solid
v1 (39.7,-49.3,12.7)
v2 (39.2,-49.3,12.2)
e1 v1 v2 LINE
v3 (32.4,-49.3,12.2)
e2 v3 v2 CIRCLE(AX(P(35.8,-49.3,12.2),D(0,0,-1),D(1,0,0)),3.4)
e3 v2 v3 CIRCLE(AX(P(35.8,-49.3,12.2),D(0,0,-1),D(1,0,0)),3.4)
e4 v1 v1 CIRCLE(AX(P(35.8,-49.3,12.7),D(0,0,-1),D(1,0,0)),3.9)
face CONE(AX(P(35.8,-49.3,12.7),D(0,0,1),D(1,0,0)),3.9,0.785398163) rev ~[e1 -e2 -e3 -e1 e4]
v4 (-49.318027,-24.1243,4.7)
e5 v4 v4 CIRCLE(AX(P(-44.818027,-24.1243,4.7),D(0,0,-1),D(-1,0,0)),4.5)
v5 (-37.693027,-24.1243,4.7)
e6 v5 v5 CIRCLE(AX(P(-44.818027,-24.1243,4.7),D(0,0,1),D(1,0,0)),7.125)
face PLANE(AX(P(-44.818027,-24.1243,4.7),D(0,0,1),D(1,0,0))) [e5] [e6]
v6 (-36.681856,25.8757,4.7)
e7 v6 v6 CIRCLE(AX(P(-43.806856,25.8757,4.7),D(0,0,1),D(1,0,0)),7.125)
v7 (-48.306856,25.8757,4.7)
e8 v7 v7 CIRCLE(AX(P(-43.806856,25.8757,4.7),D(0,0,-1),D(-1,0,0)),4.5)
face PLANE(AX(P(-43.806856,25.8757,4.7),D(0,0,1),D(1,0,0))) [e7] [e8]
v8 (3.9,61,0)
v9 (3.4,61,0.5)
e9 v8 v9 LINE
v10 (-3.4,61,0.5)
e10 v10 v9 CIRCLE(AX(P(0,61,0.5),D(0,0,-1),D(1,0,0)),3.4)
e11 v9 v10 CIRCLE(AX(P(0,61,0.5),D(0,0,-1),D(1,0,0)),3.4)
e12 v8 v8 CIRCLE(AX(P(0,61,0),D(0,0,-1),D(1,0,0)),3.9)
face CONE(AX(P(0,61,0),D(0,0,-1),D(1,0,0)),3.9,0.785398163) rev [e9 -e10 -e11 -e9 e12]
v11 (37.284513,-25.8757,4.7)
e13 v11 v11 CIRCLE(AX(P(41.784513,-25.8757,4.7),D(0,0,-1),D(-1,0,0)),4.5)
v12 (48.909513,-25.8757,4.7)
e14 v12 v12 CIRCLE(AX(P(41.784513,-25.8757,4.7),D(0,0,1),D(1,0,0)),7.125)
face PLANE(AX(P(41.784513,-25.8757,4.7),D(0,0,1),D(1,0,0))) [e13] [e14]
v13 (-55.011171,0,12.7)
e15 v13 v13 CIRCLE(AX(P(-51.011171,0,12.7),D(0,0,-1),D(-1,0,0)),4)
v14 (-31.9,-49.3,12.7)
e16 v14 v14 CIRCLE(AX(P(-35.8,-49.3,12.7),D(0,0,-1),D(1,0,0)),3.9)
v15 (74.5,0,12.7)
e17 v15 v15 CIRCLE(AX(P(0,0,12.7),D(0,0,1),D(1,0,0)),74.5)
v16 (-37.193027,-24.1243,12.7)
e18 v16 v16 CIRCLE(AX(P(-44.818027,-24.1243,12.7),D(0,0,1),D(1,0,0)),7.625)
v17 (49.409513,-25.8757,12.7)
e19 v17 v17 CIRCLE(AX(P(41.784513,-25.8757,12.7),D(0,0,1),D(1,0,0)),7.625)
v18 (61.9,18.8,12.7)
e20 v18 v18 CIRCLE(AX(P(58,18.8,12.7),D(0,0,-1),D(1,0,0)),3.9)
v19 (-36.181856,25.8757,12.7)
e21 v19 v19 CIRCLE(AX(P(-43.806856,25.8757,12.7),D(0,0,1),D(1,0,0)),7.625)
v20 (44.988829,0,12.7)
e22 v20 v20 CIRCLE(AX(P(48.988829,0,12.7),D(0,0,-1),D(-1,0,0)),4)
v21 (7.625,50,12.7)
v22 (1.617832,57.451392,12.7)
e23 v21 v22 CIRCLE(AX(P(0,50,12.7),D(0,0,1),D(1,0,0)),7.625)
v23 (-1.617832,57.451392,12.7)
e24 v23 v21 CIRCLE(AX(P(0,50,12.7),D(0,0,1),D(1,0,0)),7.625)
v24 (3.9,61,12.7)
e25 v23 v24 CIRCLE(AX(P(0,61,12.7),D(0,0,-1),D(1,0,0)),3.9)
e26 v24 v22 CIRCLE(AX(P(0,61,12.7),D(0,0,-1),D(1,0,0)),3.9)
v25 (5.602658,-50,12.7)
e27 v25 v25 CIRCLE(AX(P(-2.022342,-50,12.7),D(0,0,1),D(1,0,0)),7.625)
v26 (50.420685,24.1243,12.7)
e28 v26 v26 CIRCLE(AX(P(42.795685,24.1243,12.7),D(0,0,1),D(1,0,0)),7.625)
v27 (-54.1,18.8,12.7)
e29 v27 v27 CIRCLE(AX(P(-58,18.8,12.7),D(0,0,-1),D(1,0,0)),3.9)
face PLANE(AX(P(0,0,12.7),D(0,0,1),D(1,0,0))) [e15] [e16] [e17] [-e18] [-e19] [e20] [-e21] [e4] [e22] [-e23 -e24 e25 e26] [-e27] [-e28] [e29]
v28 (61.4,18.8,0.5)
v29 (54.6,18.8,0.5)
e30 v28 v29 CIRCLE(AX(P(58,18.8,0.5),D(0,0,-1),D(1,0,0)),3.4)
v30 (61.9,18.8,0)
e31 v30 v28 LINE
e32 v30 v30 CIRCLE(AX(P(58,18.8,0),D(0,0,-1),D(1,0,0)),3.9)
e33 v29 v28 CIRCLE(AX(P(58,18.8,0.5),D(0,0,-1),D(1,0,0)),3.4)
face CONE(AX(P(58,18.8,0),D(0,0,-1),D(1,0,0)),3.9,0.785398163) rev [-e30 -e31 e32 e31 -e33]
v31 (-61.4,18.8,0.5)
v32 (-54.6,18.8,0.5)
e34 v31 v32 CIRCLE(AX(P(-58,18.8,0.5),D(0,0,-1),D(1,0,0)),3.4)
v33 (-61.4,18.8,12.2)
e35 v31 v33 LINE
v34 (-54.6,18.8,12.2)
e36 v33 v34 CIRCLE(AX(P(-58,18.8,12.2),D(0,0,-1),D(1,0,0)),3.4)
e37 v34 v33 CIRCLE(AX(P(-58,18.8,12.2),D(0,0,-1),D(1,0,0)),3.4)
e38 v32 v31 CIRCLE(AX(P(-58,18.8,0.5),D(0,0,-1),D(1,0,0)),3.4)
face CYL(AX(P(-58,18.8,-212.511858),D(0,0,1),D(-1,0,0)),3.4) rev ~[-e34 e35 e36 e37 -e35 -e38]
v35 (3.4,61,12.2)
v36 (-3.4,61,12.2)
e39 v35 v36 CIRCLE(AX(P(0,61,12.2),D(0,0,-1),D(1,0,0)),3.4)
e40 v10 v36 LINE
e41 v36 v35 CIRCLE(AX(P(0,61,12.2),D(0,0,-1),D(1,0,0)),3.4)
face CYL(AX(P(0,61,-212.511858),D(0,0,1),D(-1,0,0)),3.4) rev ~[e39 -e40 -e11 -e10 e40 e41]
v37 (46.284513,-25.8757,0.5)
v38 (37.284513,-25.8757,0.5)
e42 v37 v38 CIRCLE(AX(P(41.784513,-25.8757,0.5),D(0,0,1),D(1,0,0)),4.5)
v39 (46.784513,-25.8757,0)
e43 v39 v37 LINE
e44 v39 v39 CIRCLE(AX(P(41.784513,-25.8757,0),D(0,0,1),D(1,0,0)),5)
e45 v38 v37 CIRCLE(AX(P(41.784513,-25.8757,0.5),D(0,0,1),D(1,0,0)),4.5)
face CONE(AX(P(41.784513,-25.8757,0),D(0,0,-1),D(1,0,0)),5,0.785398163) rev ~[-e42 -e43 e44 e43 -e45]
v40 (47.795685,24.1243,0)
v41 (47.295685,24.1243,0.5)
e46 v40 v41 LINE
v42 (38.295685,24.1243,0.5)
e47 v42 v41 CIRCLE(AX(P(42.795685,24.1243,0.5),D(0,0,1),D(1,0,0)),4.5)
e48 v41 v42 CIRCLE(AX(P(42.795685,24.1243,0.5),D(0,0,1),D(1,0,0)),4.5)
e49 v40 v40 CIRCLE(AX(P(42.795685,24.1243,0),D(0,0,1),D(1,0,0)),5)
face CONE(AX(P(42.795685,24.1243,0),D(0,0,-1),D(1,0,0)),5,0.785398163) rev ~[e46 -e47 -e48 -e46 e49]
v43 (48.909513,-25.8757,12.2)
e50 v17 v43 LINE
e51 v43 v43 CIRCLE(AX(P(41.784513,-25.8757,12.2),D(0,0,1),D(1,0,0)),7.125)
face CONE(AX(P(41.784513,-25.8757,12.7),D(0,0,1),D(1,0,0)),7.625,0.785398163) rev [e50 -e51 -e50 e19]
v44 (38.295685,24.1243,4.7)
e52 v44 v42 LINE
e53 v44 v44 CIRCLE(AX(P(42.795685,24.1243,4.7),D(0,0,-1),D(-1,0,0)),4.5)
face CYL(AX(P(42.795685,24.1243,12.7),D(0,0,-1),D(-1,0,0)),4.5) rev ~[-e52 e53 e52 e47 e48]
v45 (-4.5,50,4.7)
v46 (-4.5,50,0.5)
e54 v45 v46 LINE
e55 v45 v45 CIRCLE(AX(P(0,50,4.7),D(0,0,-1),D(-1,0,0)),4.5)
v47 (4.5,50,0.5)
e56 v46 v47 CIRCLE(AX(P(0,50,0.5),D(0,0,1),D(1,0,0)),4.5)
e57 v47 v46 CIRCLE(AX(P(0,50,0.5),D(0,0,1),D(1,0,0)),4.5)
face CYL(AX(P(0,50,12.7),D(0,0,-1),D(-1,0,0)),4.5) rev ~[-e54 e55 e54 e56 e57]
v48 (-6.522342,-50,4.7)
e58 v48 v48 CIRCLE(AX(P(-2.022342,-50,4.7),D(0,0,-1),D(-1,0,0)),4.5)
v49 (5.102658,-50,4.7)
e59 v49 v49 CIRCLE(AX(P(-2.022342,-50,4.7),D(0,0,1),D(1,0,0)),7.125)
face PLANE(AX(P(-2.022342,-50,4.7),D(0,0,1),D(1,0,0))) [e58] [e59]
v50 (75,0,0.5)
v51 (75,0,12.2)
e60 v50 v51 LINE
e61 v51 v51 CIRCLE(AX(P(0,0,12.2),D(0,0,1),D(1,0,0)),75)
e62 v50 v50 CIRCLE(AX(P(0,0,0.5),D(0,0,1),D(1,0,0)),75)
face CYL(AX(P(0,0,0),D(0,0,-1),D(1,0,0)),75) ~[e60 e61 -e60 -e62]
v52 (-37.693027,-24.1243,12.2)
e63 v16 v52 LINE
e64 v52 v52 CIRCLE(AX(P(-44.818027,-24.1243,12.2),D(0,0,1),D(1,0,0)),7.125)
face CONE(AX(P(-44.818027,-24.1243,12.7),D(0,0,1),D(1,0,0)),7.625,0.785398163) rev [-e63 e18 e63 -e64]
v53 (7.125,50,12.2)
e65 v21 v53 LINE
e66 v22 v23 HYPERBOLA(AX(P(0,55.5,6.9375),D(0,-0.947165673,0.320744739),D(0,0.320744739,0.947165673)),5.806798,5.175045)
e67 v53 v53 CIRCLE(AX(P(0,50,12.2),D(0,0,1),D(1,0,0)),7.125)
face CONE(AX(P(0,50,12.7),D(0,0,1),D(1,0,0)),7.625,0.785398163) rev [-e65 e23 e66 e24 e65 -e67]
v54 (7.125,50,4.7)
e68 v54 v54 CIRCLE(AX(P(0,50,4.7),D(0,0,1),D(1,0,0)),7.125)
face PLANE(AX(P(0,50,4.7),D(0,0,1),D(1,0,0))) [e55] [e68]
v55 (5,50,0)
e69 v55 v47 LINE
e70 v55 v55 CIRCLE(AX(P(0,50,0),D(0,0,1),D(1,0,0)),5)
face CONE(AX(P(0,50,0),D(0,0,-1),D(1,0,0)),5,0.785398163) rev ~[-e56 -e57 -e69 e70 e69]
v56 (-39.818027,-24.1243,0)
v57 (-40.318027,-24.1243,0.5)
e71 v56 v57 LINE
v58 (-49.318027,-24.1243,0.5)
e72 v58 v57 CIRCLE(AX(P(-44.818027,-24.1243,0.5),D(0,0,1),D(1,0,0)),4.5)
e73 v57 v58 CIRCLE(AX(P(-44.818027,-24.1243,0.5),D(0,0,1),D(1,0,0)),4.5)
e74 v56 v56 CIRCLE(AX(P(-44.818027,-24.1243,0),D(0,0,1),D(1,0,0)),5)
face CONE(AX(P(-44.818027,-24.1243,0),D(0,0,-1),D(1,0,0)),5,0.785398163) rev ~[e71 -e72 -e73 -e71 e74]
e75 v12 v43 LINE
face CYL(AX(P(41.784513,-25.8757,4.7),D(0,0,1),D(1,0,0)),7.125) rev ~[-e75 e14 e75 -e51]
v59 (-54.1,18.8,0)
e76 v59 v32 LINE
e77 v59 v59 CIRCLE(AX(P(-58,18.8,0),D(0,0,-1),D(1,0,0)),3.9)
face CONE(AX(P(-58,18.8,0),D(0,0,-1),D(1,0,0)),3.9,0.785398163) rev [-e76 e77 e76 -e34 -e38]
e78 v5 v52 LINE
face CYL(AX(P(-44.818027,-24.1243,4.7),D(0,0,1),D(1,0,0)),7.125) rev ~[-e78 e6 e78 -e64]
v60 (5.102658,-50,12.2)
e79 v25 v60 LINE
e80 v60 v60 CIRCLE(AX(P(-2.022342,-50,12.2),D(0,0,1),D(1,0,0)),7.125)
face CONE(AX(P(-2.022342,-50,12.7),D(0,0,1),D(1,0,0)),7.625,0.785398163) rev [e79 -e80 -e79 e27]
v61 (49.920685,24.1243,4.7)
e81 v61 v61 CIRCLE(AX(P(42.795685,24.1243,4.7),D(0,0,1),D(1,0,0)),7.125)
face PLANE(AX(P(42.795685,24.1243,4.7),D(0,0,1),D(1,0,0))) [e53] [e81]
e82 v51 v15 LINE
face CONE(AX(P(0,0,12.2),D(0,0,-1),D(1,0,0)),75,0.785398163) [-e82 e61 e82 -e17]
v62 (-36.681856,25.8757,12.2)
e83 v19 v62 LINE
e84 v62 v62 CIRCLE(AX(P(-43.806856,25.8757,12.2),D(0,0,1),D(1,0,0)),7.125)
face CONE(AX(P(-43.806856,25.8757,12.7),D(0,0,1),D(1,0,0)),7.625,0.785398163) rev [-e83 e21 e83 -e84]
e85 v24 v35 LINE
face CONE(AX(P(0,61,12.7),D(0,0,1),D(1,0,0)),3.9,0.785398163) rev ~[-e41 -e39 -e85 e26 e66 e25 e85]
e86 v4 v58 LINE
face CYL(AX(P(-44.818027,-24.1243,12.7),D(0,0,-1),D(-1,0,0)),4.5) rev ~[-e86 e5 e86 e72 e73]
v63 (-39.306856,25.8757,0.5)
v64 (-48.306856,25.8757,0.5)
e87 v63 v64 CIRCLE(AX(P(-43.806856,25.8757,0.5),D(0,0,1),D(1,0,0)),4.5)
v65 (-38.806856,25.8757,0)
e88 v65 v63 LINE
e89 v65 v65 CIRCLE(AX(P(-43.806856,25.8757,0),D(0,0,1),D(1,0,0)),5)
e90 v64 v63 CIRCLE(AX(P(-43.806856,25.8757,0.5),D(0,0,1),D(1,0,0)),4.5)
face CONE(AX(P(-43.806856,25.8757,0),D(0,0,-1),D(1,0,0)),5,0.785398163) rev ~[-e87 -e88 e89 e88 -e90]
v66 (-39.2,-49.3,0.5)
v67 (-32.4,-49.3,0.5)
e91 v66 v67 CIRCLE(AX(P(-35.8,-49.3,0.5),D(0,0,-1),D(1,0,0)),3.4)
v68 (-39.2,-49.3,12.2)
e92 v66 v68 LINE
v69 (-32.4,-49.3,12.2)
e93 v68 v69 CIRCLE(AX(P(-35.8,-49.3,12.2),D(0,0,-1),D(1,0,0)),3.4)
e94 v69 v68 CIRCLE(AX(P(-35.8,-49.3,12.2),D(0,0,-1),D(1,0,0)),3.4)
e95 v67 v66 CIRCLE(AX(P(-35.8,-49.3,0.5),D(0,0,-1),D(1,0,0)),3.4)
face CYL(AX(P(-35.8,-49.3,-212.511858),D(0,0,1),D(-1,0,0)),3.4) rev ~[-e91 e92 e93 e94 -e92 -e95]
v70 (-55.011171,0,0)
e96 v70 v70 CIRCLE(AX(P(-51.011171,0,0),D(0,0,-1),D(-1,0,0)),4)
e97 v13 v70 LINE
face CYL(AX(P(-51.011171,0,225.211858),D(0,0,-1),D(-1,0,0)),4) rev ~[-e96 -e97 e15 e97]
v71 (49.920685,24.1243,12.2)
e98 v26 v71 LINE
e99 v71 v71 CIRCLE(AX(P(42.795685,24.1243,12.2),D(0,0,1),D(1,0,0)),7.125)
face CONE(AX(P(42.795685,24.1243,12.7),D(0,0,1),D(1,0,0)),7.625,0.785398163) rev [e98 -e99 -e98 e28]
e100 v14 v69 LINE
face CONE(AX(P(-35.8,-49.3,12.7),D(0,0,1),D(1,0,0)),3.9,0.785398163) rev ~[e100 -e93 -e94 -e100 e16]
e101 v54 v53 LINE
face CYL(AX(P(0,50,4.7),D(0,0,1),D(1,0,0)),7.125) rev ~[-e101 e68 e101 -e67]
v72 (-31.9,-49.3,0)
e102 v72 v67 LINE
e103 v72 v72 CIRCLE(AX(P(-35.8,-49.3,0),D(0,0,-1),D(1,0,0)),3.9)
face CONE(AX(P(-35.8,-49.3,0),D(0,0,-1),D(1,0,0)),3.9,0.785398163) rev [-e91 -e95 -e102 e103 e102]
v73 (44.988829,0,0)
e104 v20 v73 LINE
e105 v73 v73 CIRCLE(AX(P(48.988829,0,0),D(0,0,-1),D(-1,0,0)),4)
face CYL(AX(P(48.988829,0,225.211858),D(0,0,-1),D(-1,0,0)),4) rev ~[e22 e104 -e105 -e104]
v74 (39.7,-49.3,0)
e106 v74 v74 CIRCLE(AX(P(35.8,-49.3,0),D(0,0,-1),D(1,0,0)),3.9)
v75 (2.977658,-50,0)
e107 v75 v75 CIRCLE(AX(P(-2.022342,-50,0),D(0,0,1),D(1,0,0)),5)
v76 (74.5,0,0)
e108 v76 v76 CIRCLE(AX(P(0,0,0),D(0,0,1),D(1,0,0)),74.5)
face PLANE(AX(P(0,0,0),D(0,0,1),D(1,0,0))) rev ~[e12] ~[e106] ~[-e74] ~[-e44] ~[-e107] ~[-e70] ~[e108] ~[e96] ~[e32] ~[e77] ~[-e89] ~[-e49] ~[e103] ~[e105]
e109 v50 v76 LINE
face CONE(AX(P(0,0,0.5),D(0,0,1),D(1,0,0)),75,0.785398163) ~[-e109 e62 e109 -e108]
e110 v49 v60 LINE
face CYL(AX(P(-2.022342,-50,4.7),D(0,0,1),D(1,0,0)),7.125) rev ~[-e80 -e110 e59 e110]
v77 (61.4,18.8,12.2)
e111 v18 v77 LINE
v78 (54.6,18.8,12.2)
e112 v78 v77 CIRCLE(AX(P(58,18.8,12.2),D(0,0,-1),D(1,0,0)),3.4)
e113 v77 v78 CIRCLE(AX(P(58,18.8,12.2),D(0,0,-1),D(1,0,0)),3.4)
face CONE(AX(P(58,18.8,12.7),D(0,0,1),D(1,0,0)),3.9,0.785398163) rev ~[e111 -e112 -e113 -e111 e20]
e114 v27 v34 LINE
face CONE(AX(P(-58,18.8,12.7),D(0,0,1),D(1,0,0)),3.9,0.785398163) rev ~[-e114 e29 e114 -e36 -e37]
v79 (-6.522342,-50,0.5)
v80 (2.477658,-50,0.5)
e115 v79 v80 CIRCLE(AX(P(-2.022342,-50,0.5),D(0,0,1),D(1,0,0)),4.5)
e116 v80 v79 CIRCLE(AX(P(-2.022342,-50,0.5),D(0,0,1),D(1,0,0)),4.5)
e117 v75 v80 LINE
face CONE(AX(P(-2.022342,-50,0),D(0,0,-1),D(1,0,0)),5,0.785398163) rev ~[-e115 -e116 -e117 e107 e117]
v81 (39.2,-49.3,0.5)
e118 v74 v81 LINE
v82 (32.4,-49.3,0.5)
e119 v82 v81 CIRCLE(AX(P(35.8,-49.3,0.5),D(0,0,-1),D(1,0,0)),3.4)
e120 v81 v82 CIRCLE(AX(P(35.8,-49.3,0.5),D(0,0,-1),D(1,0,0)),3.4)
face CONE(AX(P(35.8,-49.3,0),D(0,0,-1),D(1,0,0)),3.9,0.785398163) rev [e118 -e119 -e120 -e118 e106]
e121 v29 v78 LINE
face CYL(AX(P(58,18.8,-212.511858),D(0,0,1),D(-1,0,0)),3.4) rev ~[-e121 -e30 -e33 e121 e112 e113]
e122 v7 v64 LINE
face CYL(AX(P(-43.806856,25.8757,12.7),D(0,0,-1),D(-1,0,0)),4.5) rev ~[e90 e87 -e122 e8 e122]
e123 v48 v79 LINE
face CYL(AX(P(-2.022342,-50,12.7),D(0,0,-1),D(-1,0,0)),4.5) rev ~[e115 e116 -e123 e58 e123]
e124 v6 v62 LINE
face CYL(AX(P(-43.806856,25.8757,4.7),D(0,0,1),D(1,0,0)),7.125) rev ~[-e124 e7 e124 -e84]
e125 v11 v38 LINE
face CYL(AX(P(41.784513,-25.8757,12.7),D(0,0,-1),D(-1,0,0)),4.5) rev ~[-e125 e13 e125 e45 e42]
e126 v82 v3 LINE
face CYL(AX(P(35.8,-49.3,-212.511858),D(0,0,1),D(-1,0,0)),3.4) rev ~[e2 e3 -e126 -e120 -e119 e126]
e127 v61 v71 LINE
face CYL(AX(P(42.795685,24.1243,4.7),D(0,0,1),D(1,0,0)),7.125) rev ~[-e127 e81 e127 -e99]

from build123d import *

# Parameters (mm, degrees)
F0_R           = 75
F1_DEPTH       = 12.7
F2_D           = 6.8
F4_D           = 9
F4_CBORE_D     = 14.25
F4_CBORE_DEPTH = 8
F6_D           = 8


# Not quite as in the source:
# - a fillet or chamfer that OpenCascade refuses, or shapes differently, is made with other operations: its cross-section is extruded or revolved along the edge and cut away or added


with BuildPart() as f1:
    # F0 (on Top) → F1 (new body)
    with BuildSketch(Plane.XY):
        Circle(F0_R)
    extrude(amount=F1_DEPTH)

    # F2 (through all)
    with Locations(Plane(origin=(0, 0, 0), x_dir=(1, 0, 0), z_dir=(0, 0, -1))):
        with Locations((-58, -18.8), (0, -61), (58, -18.8), (35.8, 49.3), (-35.8, 49.3)):
            Hole(F2_D / 2)

    # F4 (through all)
    with Locations(Plane.XY.offset(12.7)):
        with Locations((0, 50), (-43.8068557852, 25.8756999398), (42.7956845933, 24.1243000602), (-44.8180269771, -24.1243000602), (-2.0223423839, -50), (41.7845134013, -25.8756999398)):
            CounterBoreHole(F4_D / 2, F4_CBORE_D / 2, F4_CBORE_DEPTH)

    # F5: chamfer of 0.5 on 24 edges, made by hand

    # F5_s1 → F5_t2 (revolve, cut)
    with BuildSketch(Plane.XZ):
        Polygon((75, 12.2), (74.5, 12.7), (75, 12.7), align=None)
    revolve(axis=Axis((0, 0, 12.7), (0, 0, 1)), mode=Mode.SUBTRACT)

    # F5_s3 → F5_t4 (revolve, cut)
    with BuildSketch(Plane.XZ.offset(49.3)):
        Polygon((-31.9, 12.7), (-32.4, 12.2), (-32.4, 12.7), align=None)
    revolve(axis=Axis((-35.8, -49.3, 12.7), (0, 0, -1)), mode=Mode.SUBTRACT)

    # F5_s5 → F5_t6 (revolve, cut)
    with BuildSketch(Plane.XZ.offset(50)):
        Polygon((5.6026576161, 12.7), (5.1026576161, 12.2), (5.1026576161, 12.7), align=None)
    revolve(axis=Axis((-2.0223423839, -50, 12.7), (0, 0, 1)), mode=Mode.SUBTRACT)

    # F5_s7 → F5_t8 (revolve, cut)
    with BuildSketch(Plane.XZ.offset(24.1243000602)):
        Polygon((-37.1930269771, 12.7), (-37.6930269771, 12.2), (-37.6930269771, 12.7), align=None)
    revolve(axis=Axis((-44.8180269771, -24.1243000602, 12.7), (0, 0, 1)), mode=Mode.SUBTRACT)

    # F5_s9 → F5_t10 (revolve, cut)
    with BuildSketch(Plane.XZ.offset(49.3)):
        Polygon((39.7, 12.7), (39.2, 12.2), (39.2, 12.7), align=None)
    revolve(axis=Axis((35.8, -49.3, 12.7), (0, 0, -1)), mode=Mode.SUBTRACT)

    # F5_s11 → F5_t12 (revolve, cut)
    with BuildSketch(Plane.XZ.offset(25.8756999398)):
        Polygon((49.4095134013, 12.7), (48.9095134013, 12.2), (48.9095134013, 12.7), align=None)
    revolve(axis=Axis((41.7845134013, -25.8756999398, 12.7), (0, 0, 1)), mode=Mode.SUBTRACT)

    # F5_s13 → F5_t14 (revolve, cut)
    with BuildSketch(Plane.XZ.offset(-18.8)):
        Polygon((-54.1, 12.7), (-54.6, 12.2), (-54.6, 12.7), align=None)
    revolve(axis=Axis((-58, 18.8, 12.7), (0, 0, -1)), mode=Mode.SUBTRACT)

    # F5_s15 → F5_t16 (revolve, cut)
    with BuildSketch(Plane.XZ.offset(-25.8756999398)):
        Polygon((-36.1818557852, 12.7), (-36.6818557852, 12.2), (-36.6818557852, 12.7), align=None)
    revolve(axis=Axis((-43.8068557852, 25.8756999398, 12.7), (0, 0, 1)), mode=Mode.SUBTRACT)

    # F5_s17 → F5_t18 (revolve, cut)
    with BuildSketch(Plane.XZ.offset(-18.8)):
        Polygon((61.9, 12.7), (61.4, 12.2), (61.4, 12.7), align=None)
    revolve(axis=Axis((58, 18.8, 12.7), (0, 0, -1)), mode=Mode.SUBTRACT)

    # F5_s19 → F5_t20 (revolve, cut)
    with BuildSketch(Plane.XZ.offset(-24.1243000602)):
        Polygon((50.4206845933, 12.7), (49.9206845933, 12.2), (49.9206845933, 12.7), align=None)
    revolve(axis=Axis((42.7956845933, 24.1243000602, 12.7), (0, 0, 1)), mode=Mode.SUBTRACT)

    # F5_s21 → F5_t22 (revolve, cut)
    with BuildSketch(Plane.XZ.offset(-50)):
        Polygon((7.625, 12.7), (7.125, 12.2), (7.125, 12.7), align=None)
    revolve(axis=Axis((0, 50, 12.7), (0, 0, 1)), mode=Mode.SUBTRACT)

    # F5_s23 → F5_t24 (revolve, cut)
    with BuildSketch(Plane.XZ.offset(-61)):
        Polygon((3.9, 12.7), (3.4, 12.2), (3.4, 12.7), align=None)
    revolve(axis=Axis((0, 61, 12.7), (0, 0, -1)), mode=Mode.SUBTRACT)

    # F5_s25 → F5_t26 (revolve, cut)
    with BuildSketch(Plane.XZ):
        Polygon((75, 0.5), (74.5, 0), (75, 0), align=None)
    revolve(axis=Axis((0, 0, 0), (0, 0, 1)), mode=Mode.SUBTRACT)

    # F5_s27 → F5_t28 (revolve, cut)
    with BuildSketch(Plane.XZ.offset(49.3)):
        Polygon((-31.9, 0), (-32.4, 0.5), (-32.4, 0), align=None)
    revolve(axis=Axis((-35.8, -49.3, 0), (0, 0, -1)), mode=Mode.SUBTRACT)

    # F5_s29 → F5_t30 (revolve, cut)
    with BuildSketch(Plane.XZ.offset(50)):
        Polygon((2.9776576161, 0), (2.4776576161, 0.5), (2.4776576161, 0), align=None)
    revolve(axis=Axis((-2.0223423839, -50, 0), (0, 0, 1)), mode=Mode.SUBTRACT)

    # F5_s31 → F5_t32 (revolve, cut)
    with BuildSketch(Plane.XZ.offset(24.1243000602)):
        Polygon((-39.8180269771, 0), (-40.3180269771, 0.5), (-40.3180269771, 0), align=None)
    revolve(axis=Axis((-44.8180269771, -24.1243000602, 0), (0, 0, 1)), mode=Mode.SUBTRACT)

    # F5_s33 → F5_t34 (revolve, cut)
    with BuildSketch(Plane.XZ.offset(49.3)):
        Polygon((39.7, 0), (39.2, 0.5), (39.2, 0), align=None)
    revolve(axis=Axis((35.8, -49.3, 0), (0, 0, -1)), mode=Mode.SUBTRACT)

    # F5_s35 → F5_t36 (revolve, cut)
    with BuildSketch(Plane.XZ.offset(25.8756999398)):
        Polygon((46.7845134013, 0), (46.2845134013, 0.5), (46.2845134013, 0), align=None)
    revolve(axis=Axis((41.7845134013, -25.8756999398, 0), (0, 0, 1)), mode=Mode.SUBTRACT)

    # F5_s37 → F5_t38 (revolve, cut)
    with BuildSketch(Plane.XZ.offset(-18.8)):
        Polygon((-54.1, 0), (-54.6, 0.5), (-54.6, 0), align=None)
    revolve(axis=Axis((-58, 18.8, 0), (0, 0, -1)), mode=Mode.SUBTRACT)

    # F5_s39 → F5_t40 (revolve, cut)
    with BuildSketch(Plane.XZ.offset(-25.8756999398)):
        Polygon((-38.8068557852, 0), (-39.3068557852, 0.5), (-39.3068557852, 0), align=None)
    revolve(axis=Axis((-43.8068557852, 25.8756999398, 0), (0, 0, 1)), mode=Mode.SUBTRACT)

    # F5_s41 → F5_t42 (revolve, cut)
    with BuildSketch(Plane.XZ.offset(-18.8)):
        Polygon((61.9, 0), (61.4, 0.5), (61.4, 0), align=None)
    revolve(axis=Axis((58, 18.8, 0), (0, 0, -1)), mode=Mode.SUBTRACT)

    # F5_s43 → F5_t44 (revolve, cut)
    with BuildSketch(Plane.XZ.offset(-24.1243000602)):
        Polygon((47.7956845933, 0), (47.2956845933, 0.5), (47.2956845933, 0), align=None)
    revolve(axis=Axis((42.7956845933, 24.1243000602, 0), (0, 0, 1)), mode=Mode.SUBTRACT)

    # F5_s45 → F5_t46 (revolve, cut)
    with BuildSketch(Plane.XZ.offset(-50)):
        Polygon((5, 0), (4.5, 0.5), (4.5, 0), align=None)
    revolve(axis=Axis((0, 50, 0), (0, 0, 1)), mode=Mode.SUBTRACT)

    # F5_s47 → F5_t48 (revolve, cut)
    with BuildSketch(Plane.XZ.offset(-61)):
        Polygon((3.9, 0), (3.4, 0.5), (3.4, 0), align=None)
    revolve(axis=Axis((0, 61, 0), (0, 0, -1)), mode=Mode.SUBTRACT)

    # F6 (through all)
    with Locations(Plane.XY.offset(12.7)):
        with Locations((-51.0111711919, 0), (48.9888288081, 0)):
            Hole(F6_D / 2)


solid = f1.part
